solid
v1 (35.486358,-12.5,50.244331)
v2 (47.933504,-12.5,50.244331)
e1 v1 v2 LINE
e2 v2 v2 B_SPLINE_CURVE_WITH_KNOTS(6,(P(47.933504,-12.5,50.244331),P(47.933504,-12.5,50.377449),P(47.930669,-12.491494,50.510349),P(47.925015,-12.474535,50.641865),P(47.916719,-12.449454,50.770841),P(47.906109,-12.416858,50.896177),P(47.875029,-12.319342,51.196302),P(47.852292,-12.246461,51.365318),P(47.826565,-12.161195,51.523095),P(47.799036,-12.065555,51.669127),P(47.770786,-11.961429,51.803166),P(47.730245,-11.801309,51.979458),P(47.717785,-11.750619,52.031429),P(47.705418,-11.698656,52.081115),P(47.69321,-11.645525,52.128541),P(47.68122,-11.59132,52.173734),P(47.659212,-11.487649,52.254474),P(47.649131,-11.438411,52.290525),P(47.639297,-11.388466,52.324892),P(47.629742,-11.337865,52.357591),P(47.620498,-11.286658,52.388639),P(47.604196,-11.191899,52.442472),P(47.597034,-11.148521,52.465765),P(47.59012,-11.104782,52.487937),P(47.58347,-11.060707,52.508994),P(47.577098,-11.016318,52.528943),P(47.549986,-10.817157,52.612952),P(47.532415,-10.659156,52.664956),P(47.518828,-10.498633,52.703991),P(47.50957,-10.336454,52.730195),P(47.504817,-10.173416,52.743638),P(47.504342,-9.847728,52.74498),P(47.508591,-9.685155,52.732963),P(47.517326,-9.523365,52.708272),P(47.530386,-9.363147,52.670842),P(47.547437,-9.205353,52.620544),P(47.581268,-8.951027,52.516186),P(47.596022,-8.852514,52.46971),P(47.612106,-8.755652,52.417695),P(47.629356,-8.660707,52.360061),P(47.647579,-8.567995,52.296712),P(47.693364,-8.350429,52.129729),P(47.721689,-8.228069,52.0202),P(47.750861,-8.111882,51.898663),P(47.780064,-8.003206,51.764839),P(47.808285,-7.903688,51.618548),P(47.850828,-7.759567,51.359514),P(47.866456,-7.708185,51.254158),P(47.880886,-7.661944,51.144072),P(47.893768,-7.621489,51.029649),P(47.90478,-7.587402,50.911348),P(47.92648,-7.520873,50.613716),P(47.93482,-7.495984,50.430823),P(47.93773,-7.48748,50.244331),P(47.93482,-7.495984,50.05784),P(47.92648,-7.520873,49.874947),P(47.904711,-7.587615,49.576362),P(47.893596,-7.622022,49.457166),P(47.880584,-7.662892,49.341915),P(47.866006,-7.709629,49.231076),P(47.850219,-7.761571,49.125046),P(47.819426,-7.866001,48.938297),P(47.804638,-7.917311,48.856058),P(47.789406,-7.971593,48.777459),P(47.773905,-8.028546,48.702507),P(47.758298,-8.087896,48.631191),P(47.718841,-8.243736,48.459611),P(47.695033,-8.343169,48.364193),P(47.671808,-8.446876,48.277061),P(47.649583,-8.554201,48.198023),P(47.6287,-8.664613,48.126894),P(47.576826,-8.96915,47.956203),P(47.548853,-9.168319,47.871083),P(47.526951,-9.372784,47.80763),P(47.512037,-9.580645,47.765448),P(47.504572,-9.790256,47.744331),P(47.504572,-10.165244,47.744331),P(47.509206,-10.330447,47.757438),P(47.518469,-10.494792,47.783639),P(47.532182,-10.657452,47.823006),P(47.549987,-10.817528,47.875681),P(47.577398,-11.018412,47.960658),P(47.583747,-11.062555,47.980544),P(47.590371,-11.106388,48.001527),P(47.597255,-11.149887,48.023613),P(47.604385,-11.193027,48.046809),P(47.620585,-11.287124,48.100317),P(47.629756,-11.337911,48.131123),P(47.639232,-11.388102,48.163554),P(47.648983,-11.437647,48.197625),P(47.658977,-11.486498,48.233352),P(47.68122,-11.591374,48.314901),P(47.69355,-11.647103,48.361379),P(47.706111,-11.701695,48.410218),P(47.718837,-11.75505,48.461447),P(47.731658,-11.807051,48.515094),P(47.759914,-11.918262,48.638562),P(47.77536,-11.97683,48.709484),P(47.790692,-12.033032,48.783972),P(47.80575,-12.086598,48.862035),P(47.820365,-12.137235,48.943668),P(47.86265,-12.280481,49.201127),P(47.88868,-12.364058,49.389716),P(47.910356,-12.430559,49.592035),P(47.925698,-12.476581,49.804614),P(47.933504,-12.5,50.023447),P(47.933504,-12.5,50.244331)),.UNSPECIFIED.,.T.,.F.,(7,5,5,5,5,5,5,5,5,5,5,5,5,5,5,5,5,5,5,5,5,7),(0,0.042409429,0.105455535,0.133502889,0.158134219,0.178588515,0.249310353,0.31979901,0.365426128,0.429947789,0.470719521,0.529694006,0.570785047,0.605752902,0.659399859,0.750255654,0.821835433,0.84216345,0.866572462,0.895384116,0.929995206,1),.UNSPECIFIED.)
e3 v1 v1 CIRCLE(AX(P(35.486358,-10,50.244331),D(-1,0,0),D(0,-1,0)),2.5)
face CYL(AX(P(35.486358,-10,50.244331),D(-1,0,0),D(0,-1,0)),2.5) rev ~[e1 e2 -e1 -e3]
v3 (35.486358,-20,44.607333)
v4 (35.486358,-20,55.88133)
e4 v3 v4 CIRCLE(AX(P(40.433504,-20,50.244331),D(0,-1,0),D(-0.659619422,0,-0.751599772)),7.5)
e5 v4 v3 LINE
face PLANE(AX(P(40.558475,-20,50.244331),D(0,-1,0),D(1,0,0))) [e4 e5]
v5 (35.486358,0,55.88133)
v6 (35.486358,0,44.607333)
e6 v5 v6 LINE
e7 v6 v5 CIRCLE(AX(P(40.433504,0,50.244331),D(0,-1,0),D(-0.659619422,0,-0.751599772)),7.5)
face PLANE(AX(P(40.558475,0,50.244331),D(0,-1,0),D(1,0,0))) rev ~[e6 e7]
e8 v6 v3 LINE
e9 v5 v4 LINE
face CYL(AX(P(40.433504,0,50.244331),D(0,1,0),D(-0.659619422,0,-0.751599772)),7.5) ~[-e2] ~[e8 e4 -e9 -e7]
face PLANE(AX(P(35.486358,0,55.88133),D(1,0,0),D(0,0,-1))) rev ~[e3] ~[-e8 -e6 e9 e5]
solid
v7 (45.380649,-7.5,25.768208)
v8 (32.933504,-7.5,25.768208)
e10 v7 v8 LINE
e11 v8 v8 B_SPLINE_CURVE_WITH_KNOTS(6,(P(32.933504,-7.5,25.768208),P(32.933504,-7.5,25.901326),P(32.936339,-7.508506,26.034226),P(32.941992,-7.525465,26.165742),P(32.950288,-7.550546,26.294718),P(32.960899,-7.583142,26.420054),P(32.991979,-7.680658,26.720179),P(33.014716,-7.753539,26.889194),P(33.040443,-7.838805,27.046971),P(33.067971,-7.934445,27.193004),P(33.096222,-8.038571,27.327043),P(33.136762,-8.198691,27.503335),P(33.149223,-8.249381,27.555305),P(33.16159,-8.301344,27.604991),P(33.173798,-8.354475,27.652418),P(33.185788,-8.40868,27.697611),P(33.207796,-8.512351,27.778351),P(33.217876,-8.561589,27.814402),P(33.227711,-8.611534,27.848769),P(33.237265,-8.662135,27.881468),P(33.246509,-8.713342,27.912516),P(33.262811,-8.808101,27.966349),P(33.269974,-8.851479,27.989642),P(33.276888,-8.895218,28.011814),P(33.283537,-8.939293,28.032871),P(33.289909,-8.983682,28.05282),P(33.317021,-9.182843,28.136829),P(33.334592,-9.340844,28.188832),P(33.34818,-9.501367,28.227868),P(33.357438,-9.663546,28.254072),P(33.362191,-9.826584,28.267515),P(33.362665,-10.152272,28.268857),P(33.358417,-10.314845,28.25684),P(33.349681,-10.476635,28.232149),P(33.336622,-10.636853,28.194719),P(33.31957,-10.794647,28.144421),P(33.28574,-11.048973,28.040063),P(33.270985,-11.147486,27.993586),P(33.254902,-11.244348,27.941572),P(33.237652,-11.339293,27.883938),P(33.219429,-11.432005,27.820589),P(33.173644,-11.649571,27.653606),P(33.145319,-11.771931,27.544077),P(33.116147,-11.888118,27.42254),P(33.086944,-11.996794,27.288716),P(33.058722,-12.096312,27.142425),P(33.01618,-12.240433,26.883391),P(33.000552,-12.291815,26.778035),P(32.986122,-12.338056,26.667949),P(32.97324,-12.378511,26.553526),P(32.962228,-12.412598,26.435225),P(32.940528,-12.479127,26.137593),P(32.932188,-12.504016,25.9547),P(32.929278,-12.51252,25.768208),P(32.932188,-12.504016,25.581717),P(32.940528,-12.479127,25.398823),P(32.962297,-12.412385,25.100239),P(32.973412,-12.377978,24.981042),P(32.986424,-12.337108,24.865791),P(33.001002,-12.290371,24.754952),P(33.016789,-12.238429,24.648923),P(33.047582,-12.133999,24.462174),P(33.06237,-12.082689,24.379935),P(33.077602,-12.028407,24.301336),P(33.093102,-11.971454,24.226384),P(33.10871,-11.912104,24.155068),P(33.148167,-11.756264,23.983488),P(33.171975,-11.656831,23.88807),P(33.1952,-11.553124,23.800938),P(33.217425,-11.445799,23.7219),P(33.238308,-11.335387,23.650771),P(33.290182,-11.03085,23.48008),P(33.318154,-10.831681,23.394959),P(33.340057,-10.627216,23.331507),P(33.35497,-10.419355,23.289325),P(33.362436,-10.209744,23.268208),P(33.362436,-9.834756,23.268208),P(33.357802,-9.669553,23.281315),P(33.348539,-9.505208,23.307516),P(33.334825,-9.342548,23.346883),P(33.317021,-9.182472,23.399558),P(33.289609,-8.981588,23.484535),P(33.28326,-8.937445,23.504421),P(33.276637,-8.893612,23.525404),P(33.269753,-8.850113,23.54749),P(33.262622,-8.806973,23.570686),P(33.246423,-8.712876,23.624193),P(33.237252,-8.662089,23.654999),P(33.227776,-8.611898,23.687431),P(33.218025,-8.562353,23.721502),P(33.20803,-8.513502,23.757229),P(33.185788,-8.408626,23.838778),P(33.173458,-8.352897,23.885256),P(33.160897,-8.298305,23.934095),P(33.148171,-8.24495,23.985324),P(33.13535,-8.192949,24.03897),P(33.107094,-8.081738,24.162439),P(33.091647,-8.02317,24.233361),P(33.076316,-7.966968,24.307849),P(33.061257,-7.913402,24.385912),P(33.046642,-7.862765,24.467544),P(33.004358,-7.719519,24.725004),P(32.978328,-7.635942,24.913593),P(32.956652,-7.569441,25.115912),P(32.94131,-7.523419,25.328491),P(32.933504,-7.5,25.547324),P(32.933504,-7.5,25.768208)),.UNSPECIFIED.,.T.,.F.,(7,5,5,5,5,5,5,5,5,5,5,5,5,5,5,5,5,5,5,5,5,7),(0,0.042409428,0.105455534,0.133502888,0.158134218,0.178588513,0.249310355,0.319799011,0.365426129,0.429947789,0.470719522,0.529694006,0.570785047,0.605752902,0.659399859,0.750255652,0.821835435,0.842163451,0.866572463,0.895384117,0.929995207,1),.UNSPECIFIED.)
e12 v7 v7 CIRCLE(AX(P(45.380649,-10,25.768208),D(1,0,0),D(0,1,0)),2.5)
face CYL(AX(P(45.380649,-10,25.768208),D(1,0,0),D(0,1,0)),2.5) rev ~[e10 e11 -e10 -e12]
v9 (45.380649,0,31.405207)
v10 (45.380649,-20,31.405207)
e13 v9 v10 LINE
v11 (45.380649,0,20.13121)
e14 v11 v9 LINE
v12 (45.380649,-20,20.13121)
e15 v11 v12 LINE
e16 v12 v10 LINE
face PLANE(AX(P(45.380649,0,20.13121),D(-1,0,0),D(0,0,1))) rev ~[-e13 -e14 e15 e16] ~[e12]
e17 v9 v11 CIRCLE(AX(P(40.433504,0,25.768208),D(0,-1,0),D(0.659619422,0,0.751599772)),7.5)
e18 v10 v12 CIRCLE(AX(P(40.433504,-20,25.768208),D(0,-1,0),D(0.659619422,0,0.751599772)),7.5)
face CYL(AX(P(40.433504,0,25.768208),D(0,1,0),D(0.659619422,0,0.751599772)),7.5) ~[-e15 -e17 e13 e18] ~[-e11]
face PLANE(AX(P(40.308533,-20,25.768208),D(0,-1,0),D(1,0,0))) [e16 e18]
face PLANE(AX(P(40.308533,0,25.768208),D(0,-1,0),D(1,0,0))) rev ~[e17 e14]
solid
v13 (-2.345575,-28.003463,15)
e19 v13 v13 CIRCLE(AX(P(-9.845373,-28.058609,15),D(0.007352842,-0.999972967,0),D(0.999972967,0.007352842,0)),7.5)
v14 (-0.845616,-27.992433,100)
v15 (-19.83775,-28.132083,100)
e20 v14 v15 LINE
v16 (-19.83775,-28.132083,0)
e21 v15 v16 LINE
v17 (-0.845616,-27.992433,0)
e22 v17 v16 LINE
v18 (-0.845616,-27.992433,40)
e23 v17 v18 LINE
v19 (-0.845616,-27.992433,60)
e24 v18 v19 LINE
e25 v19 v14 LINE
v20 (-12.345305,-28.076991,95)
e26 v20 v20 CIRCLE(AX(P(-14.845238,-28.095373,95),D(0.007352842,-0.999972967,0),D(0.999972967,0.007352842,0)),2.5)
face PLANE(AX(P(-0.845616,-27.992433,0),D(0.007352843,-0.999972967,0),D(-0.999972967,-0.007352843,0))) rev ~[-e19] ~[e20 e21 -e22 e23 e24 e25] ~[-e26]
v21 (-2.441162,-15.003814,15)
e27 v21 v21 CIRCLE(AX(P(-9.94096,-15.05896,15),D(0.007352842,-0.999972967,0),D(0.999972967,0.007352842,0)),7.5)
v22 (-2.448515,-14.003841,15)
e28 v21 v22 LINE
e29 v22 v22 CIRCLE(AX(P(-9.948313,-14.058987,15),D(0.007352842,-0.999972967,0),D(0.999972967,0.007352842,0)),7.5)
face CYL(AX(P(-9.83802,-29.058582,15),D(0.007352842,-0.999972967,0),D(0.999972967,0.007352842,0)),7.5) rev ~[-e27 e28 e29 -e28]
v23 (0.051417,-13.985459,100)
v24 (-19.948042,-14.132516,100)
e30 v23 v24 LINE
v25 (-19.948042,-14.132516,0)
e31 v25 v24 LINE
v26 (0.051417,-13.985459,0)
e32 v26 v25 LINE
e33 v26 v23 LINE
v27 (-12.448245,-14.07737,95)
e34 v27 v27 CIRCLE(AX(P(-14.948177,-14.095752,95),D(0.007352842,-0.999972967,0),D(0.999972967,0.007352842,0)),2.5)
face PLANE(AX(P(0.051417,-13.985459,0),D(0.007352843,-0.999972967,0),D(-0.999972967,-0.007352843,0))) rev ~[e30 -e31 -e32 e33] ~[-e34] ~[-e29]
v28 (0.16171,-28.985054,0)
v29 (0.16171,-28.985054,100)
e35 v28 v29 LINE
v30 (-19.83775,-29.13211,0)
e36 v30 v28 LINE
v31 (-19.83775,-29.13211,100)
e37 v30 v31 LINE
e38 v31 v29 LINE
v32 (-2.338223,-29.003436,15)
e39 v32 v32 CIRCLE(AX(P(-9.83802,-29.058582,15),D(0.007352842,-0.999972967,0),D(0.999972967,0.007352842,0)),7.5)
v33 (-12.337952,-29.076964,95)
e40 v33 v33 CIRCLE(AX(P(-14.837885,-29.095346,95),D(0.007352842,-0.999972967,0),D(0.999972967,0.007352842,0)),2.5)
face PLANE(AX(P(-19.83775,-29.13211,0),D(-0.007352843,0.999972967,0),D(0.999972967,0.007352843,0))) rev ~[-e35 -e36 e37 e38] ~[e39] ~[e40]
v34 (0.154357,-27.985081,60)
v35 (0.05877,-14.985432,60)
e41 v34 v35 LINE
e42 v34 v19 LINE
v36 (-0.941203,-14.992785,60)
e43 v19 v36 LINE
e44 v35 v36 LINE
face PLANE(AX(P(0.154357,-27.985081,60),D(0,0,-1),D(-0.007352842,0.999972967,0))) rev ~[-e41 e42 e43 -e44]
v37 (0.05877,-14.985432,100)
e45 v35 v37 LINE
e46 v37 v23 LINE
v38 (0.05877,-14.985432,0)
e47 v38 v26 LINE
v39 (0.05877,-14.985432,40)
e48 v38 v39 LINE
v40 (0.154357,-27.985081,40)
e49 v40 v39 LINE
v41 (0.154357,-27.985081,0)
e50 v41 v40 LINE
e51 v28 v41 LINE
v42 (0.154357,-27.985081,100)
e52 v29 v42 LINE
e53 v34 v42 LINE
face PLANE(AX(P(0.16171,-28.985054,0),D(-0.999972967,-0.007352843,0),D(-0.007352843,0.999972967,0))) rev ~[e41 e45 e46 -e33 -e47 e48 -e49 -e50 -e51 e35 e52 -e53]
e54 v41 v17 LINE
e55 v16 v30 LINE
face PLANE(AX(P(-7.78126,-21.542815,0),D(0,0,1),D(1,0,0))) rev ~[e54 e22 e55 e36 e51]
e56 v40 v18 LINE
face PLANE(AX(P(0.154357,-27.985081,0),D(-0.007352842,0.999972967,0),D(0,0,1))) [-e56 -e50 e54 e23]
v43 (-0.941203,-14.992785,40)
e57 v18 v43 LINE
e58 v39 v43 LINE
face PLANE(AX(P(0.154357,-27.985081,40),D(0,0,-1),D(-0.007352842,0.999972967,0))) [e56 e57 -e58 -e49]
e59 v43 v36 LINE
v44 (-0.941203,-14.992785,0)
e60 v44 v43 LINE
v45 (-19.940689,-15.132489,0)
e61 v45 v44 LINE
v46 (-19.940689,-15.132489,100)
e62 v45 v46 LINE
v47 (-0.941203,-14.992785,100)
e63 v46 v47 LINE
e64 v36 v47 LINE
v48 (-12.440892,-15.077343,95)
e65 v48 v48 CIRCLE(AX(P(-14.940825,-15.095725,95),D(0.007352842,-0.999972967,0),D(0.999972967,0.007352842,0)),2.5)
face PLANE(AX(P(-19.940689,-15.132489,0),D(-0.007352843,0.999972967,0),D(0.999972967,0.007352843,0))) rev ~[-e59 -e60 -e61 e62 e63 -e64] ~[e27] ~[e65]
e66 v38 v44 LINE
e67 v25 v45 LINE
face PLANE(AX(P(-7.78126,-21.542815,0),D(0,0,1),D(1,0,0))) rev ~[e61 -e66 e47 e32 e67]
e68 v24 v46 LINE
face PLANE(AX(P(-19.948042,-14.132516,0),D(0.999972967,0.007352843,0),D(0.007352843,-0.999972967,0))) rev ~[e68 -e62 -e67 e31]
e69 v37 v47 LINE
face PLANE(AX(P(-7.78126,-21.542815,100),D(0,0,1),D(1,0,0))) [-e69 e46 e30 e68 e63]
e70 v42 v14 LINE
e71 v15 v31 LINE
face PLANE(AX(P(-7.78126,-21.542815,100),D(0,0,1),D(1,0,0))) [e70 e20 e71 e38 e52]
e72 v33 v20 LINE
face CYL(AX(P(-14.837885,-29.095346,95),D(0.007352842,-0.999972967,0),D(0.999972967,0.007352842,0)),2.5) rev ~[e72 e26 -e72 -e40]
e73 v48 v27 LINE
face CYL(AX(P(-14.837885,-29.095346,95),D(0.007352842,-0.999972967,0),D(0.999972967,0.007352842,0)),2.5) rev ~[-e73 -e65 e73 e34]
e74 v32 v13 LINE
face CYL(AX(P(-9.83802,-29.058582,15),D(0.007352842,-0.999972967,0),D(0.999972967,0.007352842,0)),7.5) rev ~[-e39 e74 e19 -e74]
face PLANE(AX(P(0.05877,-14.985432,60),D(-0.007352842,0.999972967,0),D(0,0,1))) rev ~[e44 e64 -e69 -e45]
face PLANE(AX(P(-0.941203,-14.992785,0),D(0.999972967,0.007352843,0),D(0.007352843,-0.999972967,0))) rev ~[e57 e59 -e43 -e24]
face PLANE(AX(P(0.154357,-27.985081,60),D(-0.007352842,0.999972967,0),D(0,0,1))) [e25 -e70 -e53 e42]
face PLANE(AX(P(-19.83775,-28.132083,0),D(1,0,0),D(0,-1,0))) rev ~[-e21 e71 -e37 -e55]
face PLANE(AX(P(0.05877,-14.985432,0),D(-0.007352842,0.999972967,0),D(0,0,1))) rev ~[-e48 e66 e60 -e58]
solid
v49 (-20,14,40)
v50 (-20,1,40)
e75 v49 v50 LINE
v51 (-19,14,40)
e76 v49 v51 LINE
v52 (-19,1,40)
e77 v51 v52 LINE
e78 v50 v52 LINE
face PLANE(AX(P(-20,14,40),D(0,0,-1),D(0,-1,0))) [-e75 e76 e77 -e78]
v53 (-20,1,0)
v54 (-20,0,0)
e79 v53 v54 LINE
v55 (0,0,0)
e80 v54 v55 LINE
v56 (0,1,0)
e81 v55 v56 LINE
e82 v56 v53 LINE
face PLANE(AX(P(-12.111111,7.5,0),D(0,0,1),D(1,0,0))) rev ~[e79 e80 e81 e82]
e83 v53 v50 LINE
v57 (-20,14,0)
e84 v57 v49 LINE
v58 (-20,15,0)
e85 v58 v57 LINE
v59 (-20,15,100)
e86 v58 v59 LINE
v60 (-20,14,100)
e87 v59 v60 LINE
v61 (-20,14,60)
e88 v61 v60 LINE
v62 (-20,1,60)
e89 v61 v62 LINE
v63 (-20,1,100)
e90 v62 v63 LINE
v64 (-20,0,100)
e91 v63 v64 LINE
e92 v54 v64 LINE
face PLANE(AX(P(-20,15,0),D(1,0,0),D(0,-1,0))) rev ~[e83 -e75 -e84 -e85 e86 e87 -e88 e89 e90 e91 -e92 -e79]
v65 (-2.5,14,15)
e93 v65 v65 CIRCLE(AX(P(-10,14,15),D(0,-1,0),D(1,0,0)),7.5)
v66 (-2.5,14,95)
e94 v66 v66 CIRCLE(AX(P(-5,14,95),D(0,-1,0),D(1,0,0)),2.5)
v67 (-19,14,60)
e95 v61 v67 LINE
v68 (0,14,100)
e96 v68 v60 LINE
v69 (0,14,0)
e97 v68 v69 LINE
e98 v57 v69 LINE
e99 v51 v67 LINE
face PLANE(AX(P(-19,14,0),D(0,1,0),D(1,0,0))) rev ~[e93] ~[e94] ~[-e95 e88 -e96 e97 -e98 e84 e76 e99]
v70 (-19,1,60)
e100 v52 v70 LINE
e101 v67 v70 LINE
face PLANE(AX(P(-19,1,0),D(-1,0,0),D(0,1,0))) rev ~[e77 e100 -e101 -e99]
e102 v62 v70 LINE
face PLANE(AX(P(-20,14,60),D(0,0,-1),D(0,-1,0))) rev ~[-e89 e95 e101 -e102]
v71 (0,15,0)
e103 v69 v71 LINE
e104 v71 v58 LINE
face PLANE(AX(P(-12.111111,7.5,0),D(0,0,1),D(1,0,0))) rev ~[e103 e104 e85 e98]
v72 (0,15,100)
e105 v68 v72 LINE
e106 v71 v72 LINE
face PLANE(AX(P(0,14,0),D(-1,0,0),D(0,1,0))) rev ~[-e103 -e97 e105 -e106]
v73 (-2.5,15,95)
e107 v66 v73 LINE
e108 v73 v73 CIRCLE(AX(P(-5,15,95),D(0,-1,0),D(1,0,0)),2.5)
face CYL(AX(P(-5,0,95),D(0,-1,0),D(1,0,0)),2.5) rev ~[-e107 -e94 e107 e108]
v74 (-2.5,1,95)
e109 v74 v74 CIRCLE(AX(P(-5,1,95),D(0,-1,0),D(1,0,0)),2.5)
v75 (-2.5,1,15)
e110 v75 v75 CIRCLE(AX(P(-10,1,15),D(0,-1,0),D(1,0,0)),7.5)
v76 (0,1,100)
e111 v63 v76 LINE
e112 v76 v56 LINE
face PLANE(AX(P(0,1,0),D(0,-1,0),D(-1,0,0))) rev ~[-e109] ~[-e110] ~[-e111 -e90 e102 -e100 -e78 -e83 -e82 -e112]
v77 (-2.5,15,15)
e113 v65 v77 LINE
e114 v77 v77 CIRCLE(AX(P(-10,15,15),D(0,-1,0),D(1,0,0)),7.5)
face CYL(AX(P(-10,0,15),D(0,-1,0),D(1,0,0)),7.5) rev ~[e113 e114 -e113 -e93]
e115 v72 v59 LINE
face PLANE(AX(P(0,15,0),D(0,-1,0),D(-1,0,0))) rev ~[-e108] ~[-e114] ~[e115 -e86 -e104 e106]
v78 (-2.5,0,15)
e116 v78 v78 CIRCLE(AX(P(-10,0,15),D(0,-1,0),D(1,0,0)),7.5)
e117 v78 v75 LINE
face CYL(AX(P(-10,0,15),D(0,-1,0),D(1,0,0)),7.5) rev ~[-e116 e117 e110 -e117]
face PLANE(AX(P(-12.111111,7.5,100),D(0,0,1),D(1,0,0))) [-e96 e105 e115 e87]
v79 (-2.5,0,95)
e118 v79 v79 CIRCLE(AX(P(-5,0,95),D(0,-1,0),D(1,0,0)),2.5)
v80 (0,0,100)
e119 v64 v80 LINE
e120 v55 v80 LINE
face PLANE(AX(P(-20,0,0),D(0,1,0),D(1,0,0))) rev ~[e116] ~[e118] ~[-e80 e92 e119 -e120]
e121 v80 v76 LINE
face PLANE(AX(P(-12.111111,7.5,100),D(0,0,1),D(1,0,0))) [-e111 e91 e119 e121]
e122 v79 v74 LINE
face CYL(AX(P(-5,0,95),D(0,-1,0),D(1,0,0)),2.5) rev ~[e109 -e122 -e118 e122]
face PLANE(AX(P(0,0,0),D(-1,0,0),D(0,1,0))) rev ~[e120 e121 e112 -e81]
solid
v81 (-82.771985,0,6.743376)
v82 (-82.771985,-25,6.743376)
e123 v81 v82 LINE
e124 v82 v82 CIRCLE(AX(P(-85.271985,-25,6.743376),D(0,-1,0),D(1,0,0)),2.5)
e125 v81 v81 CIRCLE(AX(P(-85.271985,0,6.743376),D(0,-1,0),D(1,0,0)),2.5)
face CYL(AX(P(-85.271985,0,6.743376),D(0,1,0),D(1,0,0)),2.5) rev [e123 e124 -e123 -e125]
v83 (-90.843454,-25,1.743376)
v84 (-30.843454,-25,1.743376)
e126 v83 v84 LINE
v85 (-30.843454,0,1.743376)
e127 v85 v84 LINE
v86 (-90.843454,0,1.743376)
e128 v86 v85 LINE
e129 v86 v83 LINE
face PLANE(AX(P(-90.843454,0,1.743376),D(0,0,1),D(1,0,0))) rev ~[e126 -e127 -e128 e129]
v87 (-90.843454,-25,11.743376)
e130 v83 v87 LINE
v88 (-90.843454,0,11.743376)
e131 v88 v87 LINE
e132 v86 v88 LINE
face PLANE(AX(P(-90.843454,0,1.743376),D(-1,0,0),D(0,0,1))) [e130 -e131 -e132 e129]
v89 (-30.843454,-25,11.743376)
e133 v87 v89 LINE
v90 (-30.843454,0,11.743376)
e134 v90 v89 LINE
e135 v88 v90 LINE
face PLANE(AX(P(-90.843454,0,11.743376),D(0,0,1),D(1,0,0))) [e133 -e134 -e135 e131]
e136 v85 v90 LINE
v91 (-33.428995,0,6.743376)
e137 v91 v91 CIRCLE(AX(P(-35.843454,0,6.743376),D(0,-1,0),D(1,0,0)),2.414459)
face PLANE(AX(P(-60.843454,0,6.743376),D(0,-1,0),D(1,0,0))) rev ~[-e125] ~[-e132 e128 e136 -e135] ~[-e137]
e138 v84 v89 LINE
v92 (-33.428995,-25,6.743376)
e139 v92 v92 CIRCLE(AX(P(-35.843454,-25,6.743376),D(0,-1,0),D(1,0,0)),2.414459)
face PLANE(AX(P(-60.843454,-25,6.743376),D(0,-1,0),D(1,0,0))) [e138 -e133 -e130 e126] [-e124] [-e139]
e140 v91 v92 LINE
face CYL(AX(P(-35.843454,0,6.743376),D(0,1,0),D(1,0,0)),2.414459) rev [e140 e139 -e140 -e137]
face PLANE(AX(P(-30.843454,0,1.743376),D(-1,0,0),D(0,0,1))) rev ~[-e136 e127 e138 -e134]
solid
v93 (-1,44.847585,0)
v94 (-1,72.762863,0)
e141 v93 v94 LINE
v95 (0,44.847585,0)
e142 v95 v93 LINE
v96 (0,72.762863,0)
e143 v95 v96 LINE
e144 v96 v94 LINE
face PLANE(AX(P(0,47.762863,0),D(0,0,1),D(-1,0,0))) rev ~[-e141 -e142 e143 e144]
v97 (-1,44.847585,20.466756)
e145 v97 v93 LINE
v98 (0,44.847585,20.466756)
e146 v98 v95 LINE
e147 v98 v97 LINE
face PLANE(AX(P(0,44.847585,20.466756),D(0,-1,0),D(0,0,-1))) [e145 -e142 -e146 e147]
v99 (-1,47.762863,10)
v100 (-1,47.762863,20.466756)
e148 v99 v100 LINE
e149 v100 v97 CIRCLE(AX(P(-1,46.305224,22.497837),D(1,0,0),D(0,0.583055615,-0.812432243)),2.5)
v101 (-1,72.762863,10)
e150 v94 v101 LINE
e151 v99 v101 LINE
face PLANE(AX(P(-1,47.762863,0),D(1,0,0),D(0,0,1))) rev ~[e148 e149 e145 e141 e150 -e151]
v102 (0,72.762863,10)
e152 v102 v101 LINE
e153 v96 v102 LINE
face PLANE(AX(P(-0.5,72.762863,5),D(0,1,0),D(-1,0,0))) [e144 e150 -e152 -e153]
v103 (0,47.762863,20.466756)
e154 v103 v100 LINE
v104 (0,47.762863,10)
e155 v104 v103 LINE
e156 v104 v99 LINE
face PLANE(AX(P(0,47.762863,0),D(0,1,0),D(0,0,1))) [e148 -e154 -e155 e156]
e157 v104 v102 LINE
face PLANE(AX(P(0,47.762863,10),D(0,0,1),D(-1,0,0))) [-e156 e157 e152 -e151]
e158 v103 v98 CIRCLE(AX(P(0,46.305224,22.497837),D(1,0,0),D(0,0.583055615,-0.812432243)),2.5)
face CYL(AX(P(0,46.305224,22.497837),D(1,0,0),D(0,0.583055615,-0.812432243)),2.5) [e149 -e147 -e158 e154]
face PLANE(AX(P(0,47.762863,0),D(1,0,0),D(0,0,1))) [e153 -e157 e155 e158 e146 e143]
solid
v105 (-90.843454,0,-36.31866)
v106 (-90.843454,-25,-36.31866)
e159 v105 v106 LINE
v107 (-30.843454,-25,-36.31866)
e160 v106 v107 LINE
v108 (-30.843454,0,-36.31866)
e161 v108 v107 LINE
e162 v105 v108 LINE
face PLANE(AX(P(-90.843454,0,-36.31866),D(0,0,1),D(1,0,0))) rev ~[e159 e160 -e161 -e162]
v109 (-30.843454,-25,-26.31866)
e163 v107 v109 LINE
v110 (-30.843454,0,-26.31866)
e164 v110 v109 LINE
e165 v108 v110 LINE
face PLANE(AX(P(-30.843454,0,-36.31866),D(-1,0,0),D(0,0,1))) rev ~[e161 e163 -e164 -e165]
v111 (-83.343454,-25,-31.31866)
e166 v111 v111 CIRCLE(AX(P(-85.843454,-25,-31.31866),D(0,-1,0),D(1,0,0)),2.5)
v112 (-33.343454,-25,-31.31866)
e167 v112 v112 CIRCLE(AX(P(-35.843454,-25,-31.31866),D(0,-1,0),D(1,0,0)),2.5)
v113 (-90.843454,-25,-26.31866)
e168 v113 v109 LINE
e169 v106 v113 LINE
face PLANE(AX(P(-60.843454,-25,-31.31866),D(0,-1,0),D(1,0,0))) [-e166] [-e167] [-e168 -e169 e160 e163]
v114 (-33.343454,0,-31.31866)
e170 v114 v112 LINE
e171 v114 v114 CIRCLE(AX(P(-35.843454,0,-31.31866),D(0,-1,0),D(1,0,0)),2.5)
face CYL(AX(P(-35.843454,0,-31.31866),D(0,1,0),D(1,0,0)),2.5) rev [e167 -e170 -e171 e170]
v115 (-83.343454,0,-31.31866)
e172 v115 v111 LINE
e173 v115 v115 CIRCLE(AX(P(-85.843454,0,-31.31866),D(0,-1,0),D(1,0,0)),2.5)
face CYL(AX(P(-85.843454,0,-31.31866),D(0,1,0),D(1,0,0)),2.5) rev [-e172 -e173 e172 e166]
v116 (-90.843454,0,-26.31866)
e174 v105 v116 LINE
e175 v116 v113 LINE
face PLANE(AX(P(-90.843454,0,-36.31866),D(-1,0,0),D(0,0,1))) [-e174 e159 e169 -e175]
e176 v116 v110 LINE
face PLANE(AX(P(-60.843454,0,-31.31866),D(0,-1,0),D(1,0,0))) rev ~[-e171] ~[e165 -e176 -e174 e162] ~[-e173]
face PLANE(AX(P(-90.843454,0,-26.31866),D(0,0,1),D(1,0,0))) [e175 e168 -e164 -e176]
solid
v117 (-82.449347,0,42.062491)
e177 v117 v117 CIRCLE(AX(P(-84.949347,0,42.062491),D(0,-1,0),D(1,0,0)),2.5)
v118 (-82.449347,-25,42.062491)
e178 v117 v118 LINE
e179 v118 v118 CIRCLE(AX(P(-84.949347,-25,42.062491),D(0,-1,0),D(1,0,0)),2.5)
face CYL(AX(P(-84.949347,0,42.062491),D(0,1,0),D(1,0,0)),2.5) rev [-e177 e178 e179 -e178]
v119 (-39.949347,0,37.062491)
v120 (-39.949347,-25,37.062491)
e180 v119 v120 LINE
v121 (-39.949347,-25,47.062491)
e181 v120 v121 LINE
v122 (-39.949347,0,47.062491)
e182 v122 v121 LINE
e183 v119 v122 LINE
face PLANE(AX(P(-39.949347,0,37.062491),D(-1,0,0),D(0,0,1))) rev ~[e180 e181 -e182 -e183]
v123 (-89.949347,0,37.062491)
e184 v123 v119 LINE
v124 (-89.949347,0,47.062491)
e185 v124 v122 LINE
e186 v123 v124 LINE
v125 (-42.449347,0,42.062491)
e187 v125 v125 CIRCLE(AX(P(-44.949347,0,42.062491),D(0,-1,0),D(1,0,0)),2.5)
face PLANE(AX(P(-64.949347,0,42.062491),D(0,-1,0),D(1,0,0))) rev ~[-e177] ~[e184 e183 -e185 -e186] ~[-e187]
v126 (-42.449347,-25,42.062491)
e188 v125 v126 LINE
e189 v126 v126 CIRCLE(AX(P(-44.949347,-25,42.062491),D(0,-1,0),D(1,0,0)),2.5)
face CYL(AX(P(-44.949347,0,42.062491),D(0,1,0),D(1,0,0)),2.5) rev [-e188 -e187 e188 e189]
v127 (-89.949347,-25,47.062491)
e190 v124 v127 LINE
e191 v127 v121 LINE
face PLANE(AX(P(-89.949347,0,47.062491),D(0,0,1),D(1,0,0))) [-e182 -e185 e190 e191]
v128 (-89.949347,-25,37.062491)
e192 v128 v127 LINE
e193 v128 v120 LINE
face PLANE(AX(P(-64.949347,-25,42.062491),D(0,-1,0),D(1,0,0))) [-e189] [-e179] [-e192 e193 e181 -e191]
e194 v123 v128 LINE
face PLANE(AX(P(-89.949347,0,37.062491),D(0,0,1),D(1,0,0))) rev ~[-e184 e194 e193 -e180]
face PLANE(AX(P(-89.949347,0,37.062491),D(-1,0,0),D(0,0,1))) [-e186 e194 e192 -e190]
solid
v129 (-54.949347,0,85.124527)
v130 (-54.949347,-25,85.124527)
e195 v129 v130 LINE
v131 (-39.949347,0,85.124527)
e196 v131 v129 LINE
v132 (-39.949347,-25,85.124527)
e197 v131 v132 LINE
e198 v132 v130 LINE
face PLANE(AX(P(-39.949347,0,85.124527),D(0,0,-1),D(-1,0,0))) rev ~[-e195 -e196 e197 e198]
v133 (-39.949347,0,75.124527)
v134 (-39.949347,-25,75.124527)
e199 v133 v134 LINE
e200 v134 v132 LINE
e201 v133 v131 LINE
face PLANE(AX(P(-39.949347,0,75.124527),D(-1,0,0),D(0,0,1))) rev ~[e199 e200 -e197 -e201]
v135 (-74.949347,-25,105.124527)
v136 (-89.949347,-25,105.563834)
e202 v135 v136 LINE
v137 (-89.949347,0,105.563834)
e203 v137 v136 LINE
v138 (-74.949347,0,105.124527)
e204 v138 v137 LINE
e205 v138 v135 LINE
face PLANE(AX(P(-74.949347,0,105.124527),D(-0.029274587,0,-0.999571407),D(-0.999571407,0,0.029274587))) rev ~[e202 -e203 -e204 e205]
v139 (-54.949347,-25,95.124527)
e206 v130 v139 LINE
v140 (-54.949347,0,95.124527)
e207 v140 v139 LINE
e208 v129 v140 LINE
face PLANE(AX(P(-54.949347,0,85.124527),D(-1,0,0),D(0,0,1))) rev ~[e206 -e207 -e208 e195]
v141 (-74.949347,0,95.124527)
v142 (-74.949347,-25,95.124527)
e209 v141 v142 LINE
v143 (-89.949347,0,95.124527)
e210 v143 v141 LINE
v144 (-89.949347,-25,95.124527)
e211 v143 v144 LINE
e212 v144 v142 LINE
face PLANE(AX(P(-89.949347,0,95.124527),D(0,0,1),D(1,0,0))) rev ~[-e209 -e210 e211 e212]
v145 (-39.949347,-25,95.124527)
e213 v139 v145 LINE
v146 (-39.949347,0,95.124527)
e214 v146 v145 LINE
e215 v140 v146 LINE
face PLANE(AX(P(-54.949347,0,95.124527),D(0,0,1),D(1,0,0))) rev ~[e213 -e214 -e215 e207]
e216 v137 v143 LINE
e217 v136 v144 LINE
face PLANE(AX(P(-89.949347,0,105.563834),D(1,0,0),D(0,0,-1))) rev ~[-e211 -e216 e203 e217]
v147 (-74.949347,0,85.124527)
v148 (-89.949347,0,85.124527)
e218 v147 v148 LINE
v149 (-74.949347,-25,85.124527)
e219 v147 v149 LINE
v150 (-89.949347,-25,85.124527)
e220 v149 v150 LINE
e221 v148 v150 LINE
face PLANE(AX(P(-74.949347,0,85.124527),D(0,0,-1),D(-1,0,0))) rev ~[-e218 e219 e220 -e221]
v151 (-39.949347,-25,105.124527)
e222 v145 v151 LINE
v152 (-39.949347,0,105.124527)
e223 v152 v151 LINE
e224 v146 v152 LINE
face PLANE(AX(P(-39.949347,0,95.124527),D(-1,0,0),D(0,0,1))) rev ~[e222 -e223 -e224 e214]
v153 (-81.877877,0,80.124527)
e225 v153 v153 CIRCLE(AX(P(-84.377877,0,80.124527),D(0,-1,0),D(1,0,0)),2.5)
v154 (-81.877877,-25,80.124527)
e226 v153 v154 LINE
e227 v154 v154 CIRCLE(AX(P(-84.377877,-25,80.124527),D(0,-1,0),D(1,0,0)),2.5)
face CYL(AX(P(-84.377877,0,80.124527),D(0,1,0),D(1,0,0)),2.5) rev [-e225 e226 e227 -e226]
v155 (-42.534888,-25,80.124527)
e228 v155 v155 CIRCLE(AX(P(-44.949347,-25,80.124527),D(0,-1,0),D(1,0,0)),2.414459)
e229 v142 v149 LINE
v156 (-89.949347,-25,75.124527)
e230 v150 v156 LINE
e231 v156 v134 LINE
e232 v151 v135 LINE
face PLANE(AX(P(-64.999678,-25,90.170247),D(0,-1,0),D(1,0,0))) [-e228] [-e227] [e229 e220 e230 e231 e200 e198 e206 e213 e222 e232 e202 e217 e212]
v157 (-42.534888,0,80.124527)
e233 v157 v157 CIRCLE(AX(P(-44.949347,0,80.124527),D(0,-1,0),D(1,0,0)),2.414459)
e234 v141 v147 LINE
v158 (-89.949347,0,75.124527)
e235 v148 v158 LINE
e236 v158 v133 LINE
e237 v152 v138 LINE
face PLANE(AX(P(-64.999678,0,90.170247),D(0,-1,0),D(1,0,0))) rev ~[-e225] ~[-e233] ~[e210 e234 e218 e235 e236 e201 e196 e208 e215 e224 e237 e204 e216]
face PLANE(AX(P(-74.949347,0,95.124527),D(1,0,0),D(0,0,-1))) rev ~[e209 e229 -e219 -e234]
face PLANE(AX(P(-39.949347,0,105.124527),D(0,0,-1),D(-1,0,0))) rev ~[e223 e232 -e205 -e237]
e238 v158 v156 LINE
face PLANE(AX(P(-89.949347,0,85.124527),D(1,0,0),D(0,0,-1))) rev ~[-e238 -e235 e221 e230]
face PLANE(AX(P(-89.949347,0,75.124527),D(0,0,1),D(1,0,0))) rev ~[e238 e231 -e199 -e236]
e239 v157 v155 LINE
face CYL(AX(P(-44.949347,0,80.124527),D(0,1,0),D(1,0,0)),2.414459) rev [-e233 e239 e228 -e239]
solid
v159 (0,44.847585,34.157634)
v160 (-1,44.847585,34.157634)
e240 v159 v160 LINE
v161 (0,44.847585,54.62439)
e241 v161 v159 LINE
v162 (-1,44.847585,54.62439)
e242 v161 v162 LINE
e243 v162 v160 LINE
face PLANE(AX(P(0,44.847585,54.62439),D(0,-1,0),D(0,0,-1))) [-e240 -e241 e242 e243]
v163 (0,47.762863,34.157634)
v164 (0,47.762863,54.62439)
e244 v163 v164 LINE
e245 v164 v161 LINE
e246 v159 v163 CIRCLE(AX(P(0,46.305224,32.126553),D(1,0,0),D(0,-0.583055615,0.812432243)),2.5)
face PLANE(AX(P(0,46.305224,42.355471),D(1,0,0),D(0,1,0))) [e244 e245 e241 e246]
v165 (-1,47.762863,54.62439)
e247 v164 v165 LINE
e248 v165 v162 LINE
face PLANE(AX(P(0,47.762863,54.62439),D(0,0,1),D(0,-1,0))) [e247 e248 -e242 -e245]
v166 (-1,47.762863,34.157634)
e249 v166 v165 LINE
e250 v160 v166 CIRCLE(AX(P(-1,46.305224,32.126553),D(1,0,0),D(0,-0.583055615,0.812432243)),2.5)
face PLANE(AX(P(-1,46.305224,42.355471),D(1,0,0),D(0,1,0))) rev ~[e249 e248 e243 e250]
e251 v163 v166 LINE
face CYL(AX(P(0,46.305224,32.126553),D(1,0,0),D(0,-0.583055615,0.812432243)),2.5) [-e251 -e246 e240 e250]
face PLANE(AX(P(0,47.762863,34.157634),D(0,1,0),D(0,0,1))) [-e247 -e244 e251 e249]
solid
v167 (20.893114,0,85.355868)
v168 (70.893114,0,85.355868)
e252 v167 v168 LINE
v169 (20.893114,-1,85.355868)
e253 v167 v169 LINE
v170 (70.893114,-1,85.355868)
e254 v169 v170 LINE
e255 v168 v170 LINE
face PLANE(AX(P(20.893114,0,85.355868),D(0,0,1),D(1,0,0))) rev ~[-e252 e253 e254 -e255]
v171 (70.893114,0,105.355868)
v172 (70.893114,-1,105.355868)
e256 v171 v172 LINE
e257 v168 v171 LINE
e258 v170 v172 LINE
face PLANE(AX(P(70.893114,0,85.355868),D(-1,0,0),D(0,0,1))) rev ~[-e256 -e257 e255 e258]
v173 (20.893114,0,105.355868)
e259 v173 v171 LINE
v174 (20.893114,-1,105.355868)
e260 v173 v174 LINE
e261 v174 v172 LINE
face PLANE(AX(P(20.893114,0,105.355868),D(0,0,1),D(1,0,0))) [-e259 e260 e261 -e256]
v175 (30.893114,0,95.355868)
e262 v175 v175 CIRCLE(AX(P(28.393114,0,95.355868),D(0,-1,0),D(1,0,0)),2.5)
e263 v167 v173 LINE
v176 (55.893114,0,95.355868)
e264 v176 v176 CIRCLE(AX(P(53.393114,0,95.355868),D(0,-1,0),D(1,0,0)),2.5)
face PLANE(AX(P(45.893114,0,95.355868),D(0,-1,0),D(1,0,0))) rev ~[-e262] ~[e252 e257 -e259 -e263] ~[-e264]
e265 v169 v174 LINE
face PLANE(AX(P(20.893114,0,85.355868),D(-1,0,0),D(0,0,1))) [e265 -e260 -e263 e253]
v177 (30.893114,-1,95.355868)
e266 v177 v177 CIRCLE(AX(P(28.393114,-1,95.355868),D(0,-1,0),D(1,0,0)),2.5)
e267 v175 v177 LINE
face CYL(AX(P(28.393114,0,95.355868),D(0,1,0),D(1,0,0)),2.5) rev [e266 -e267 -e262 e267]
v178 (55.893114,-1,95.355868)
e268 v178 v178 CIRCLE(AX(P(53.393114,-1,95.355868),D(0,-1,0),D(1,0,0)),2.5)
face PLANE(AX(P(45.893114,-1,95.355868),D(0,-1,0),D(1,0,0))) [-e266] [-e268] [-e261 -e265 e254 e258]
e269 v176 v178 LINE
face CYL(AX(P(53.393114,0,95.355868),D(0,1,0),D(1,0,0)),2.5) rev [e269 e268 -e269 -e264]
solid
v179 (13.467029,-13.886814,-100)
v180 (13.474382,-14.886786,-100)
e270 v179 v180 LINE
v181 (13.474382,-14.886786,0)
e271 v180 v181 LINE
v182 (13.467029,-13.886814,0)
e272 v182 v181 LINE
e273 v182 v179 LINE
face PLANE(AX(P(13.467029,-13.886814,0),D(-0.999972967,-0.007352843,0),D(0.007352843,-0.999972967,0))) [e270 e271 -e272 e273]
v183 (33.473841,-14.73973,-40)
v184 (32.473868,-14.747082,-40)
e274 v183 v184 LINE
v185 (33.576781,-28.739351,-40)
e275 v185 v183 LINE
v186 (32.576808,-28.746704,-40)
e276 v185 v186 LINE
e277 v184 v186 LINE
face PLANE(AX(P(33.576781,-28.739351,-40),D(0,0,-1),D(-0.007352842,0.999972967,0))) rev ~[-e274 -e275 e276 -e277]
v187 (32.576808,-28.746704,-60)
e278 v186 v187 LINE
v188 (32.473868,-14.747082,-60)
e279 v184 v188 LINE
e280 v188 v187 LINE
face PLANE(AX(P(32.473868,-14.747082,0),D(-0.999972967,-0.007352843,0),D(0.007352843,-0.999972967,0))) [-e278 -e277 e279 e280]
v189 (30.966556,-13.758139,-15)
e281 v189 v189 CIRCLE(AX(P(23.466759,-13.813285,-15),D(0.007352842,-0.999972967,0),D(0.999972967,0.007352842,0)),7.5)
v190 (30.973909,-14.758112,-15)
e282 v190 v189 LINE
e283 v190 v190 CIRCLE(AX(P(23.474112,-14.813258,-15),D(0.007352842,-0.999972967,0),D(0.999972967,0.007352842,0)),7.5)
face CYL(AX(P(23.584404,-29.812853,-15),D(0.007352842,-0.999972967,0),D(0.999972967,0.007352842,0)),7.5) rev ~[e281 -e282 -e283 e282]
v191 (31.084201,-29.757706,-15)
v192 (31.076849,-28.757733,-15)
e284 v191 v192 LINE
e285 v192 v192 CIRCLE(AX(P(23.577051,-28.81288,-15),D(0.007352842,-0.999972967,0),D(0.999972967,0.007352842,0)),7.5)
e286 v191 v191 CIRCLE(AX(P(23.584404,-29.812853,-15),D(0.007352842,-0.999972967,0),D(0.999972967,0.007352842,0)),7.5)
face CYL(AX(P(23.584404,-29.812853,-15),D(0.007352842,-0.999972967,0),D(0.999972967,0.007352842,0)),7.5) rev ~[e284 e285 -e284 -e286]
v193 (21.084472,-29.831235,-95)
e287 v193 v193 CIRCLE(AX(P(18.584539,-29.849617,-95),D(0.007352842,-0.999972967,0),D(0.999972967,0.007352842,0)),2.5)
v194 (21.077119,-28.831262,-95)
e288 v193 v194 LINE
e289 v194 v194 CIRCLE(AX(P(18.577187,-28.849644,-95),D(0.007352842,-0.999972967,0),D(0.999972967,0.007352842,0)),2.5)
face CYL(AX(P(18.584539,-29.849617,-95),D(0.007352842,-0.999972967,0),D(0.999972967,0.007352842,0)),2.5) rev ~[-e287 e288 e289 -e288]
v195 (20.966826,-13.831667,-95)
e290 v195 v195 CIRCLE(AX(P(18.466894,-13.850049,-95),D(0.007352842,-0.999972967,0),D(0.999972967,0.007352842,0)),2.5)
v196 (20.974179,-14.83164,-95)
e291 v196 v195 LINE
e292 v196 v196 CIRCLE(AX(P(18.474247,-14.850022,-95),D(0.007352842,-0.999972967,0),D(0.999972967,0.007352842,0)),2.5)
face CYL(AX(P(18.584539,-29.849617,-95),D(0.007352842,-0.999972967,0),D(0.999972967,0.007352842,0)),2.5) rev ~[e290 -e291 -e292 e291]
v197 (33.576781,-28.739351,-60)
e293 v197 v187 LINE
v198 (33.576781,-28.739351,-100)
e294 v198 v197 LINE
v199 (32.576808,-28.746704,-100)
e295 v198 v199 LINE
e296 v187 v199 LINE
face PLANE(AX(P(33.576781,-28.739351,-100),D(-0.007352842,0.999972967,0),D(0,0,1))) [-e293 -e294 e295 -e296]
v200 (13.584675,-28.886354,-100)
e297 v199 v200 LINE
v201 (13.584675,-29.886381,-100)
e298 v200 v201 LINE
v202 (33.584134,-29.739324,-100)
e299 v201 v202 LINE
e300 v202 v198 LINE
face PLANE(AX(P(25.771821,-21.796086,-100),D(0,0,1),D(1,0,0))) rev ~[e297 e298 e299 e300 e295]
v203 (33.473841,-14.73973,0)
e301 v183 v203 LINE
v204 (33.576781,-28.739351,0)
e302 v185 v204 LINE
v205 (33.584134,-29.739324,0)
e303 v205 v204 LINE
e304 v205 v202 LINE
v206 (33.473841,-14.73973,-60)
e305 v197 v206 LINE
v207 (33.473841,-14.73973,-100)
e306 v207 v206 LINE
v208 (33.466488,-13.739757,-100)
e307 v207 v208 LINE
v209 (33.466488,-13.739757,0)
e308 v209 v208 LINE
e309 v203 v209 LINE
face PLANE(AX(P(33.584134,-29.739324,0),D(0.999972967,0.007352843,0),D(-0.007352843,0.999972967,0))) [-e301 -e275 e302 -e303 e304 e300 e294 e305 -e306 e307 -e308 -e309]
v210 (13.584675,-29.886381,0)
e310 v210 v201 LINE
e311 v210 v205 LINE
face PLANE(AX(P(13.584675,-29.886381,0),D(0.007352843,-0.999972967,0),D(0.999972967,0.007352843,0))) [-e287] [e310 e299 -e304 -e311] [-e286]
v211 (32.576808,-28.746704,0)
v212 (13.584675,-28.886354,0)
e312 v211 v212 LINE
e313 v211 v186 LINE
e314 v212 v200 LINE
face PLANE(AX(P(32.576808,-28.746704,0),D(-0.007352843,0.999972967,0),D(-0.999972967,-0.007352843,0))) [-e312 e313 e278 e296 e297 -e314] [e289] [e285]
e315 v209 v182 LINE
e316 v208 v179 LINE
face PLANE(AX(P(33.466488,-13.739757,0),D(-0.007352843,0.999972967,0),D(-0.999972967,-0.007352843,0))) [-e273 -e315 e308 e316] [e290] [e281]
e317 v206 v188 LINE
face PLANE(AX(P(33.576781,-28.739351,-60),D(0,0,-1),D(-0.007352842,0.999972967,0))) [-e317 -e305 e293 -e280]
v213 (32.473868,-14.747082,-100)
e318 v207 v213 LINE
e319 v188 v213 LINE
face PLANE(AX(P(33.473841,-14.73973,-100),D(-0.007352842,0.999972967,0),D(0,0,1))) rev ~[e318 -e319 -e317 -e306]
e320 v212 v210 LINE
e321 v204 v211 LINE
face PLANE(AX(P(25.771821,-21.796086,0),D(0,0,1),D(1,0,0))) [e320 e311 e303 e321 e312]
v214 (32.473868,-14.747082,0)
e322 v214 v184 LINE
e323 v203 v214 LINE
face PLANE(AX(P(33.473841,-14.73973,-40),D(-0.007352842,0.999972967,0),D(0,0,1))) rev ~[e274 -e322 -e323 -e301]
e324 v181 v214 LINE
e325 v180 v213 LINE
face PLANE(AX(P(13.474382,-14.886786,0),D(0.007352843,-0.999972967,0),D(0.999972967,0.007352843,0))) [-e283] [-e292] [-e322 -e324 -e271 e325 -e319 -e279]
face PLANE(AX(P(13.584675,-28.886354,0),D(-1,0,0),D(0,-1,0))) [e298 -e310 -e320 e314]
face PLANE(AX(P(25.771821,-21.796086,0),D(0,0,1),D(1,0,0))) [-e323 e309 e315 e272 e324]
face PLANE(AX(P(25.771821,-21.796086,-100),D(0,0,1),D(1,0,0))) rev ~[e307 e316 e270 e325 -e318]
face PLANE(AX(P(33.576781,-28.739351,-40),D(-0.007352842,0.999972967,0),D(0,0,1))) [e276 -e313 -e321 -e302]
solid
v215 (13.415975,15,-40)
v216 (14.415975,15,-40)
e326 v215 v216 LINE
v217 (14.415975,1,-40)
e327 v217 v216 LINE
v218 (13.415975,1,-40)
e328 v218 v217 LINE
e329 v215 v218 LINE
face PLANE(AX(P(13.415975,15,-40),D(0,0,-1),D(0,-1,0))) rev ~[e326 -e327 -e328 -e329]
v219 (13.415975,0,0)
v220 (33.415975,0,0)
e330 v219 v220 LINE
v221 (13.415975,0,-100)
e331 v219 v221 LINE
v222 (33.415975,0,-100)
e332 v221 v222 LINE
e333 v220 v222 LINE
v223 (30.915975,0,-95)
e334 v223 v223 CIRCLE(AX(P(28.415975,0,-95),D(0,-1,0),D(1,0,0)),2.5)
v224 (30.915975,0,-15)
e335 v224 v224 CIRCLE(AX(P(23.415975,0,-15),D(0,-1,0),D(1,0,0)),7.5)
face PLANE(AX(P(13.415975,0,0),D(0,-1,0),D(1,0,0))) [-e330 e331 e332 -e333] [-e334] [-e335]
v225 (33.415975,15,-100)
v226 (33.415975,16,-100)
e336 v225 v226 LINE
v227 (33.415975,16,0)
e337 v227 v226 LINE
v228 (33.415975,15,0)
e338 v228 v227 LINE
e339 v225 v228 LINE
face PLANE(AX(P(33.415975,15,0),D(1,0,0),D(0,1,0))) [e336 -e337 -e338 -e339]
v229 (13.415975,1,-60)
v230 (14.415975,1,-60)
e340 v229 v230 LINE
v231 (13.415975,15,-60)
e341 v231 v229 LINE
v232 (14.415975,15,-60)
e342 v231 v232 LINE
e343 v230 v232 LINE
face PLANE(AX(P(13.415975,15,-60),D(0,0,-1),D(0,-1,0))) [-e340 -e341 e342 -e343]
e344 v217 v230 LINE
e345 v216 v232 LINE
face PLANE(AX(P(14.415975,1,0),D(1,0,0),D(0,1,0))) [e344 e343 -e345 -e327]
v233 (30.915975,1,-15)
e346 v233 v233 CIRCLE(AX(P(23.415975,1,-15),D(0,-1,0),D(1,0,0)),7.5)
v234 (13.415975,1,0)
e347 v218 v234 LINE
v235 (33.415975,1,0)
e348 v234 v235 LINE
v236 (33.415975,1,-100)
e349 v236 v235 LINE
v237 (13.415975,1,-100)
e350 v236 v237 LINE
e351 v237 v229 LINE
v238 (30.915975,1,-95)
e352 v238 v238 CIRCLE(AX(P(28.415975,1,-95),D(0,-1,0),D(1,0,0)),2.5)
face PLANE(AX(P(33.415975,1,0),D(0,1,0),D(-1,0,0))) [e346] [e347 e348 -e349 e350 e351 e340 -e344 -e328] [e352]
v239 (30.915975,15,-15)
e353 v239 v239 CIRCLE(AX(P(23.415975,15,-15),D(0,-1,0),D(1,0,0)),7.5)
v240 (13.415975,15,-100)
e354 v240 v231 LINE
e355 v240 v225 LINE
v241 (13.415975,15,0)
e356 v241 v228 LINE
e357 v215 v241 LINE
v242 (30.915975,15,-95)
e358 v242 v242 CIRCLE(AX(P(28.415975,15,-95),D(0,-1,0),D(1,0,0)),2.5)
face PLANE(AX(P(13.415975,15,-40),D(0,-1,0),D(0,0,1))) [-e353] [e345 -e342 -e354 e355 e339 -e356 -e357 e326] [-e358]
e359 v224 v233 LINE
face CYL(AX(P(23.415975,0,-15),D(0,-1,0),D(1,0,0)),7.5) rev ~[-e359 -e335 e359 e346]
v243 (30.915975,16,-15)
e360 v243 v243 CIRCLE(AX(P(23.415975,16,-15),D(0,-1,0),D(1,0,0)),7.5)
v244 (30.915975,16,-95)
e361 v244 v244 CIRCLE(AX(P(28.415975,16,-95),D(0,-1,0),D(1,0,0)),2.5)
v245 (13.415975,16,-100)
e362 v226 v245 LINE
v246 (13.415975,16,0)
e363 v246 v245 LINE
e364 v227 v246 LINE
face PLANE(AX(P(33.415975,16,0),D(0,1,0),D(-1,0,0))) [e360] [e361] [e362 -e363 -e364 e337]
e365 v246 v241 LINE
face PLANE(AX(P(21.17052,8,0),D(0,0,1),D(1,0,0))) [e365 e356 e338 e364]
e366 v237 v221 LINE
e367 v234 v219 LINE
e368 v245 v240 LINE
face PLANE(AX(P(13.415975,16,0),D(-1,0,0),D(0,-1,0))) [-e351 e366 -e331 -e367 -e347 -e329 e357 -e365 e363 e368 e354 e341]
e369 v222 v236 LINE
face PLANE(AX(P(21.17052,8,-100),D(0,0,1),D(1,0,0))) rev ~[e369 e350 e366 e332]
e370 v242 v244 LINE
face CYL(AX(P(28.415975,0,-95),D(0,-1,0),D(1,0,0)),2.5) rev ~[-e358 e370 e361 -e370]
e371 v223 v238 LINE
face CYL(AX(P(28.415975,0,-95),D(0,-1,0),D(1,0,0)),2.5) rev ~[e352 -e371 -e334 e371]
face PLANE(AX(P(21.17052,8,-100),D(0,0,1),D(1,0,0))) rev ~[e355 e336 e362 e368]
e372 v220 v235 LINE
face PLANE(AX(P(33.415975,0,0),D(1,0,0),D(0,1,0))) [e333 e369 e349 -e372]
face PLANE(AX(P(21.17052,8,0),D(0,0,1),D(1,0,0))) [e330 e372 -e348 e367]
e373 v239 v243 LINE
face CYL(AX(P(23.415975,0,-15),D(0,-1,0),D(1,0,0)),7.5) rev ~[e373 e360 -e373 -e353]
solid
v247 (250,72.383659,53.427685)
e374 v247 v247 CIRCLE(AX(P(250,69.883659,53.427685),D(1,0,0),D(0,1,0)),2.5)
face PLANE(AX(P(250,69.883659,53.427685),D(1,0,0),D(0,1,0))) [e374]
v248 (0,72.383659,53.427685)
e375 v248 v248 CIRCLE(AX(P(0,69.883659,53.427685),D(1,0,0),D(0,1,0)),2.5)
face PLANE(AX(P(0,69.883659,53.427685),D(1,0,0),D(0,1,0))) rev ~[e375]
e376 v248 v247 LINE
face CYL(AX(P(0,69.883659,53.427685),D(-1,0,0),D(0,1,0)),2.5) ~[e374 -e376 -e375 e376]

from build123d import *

# Parameters (mm, degrees)
F1_DEPTH  = 100
F2_R      = 7.5
F2_R_2    = 2.5
F3_DEPTH  = 15.001
F4_W      = 13
F4_H      = 40
F5_DEPTH  = 20.1627097718
F6_DEPTH  = 100
F7_R      = 7.5
F7_R_2    = 2.5
F8_DEPTH  = 16.001
F9_W      = 14
F9_H      = 40
F10_DEPTH = 20.1691592966
F11_W     = 50
F11_H     = 20
F11_R     = 2.5
F12_DEPTH = 1
F13_R     = 2.5
F13_R_2   = 7.5
F14_DEPTH = 45.1330833913
F15_R     = 7.5
F15_R_2   = 2.5
F16_DEPTH = 46.1330833913
F17_W     = 14
F17_H     = 40
F18_DEPTH = 53.5847666336
F19_W     = 13
F19_H     = 40
F20_DEPTH = 25
F22_DEPTH = 20
F23_R     = 2.5
F24_DEPTH = 250
F25_W     = 50
F25_H     = 10
F25_R     = 2.5
F26_DEPTH = 25
F25_R_2   = 2.4144593705
F25_W_2   = 60
F27_DEPTH = 25
F28_R     = 2.5
F29_DEPTH = 136.2251037518
F30_R     = 2.5
F31_DEPTH = 214.5146418358
F33_DEPTH = 1
F34_W     = 1
F34_H     = 10
F35_DEPTH = 25


# Not quite as in the source:
# - a feature names something its author has since deleted; it is built from what else it names


with BuildPart() as f1:
    # F0 (on Top) → F1 (new body)
    with BuildSketch(Plane.XY):
        Polygon((0, 14), (0, 15), (-20, 15), (-20, 0), (0, 0), (0, 1), (-19, 1), (-19, 14), align=None)
    extrude(amount=F1_DEPTH)

    # F2 (on face) → F3 (cut, through all)
    with BuildSketch(Plane.XZ):
        with Locations((-10, 15)):
            Circle(F2_R)
        with Locations((-5, 95)):
            Circle(F2_R_2)
    extrude(amount=-F3_DEPTH, mode=Mode.SUBTRACT)

    # F4 (on face) → F5 (cut, through all)
    with BuildSketch(Plane(origin=(-20, 0, 0), x_dir=(0, -1, 0), z_dir=(-1, 0, 0))):
        with Locations((-7.5, 20)):
            Rectangle(F4_W, F4_H)
        with Locations((-7.5, 80)):
            Rectangle(F4_W, F4_H)
    extrude(amount=-F5_DEPTH, mode=Mode.SUBTRACT)


with BuildPart() as f1b:
    # F0 (on Top) → F1, piece 2 (new body)
    with BuildSketch(Plane.XY):
        Polygon((0.051417134, -13.985459061), (-19.9480422158, -14.1325159114), (-19.9406893732, -15.1324888789), (-0.941202991, -14.992784871), (-0.8456160382, -27.9924334484), (-19.837749578, -28.1320833905), (-19.837749578, -29.1321104238), (0.1617097718, -28.9850535734), align=None)
    extrude(amount=F1_DEPTH)

    # F13 (on face) → F14 (cut, through all)
    with BuildSketch(Plane(origin=(0.2131255159, -28.9846755113, 0), x_dir=(0.9999729675, 0.0073528425, 0), z_dir=(0.0073528425, -0.9999729675, 0))):
        with Locations((-15.051417134, 95)):
            Circle(F13_R)
        with Locations((-10.051417134, 15)):
            Circle(F13_R_2)
    extrude(amount=-F14_DEPTH, mode=Mode.SUBTRACT)

    # F19 (on face) → F20 (cut)
    with BuildSketch(Plane(origin=(-0.0514157441, -0.0003780621, 0), x_dir=(-0.0073528425, 0.9999729675, 0), z_dir=(0.9999729675, 0.0073528425, 0))):
        with Locations((-21.485459061, 20)):
            Rectangle(F19_W, F19_H)
        with Locations((-21.485459061, 80)):
            Rectangle(F19_W, F19_H)
    extrude(amount=-F20_DEPTH, mode=Mode.SUBTRACT)


with BuildPart() as f6:
    # F0 (on Top) → F6 (new body)
    with BuildSketch(Plane.XY):
        Polygon((33.4159745649, 0), (33.4159745649, 1), (14.4159745649, 1), (14.4159745649, 15), (33.4159745649, 15), (33.4159745649, 16), (13.4159745649, 16), (13.4159745649, 0), align=None)
    extrude(amount=-F6_DEPTH)

    # F7 (on face) → F8 (cut, through all)
    with BuildSketch(Plane.XZ):
        with Locations((23.4159745649, -15)):
            Circle(F7_R)
        with Locations((28.4159745649, -95)):
            Circle(F7_R_2)
    extrude(amount=-F8_DEPTH, mode=Mode.SUBTRACT)

    # F9 (on face) → F10 (cut, through all)
    with BuildSketch(Plane(origin=(13.4159745649, 0, 0), x_dir=(0, -1, 0), z_dir=(-1, 0, 0))):
        with Locations((-8, -20)):
            Rectangle(F9_W, F9_H)
        with Locations((-8, -80)):
            Rectangle(F9_W, F9_H)
    extrude(amount=-F10_DEPTH, mode=Mode.SUBTRACT)


with BuildPart() as f6b:
    # F0 (on Top) → F6, piece 2 (new body)
    with BuildSketch(Plane.XY):
        Polygon((33.4664883811, -13.7397566624), (13.4670290313, -13.8868135128), (13.4743818739, -14.8867864803), (32.4738682561, -14.7470824724), (32.5768080514, -28.7467040172), (13.5846745117, -28.8863539594), (13.5846745117, -29.8863809926), (33.5841338614, -29.7393241422), align=None)
    extrude(amount=-F6_DEPTH)

    # F15 (on face) → F16 (cut, through all)
    with BuildSketch(Plane(origin=(0.2204783584, -29.9846484788, 0), x_dir=(0.9999729675, 0.0073528425, 0), z_dir=(0.0073528425, -0.9999729675, 0))):
        with Locations((23.3645574309, -15)):
            Circle(F15_R)
        with Locations((18.3645574309, -95)):
            Circle(F15_R_2)
    extrude(amount=-F16_DEPTH, mode=Mode.SUBTRACT)

    # F17 (on face) → F18 (cut, through all)
    with BuildSketch(Plane(origin=(33.3636555031, 0.2453243365, 0), x_dir=(-0.0073528425, 0.9999729675, 0), z_dir=(0.9999729675, 0.0073528425, 0))):
        with Locations((-21.985459061, -20)):
            Rectangle(F17_W, F17_H)
        with Locations((-21.985459061, -80)):
            Rectangle(F17_W, F17_H)
    extrude(amount=-F18_DEPTH, mode=Mode.SUBTRACT)


with BuildPart() as f12:
    # F11 (on Front) → F12 (new body)
    with BuildSketch(Plane.XZ):
        with Locations((45.8931141218, 95.3558683395)):
            Rectangle(F11_W, F11_H)
        with Locations((28.3931141218, 95.3558683395)):
            Circle(F11_R, mode=Mode.SUBTRACT)
        with Locations((53.3931141218, 95.3558683395)):
            Circle(F11_R, mode=Mode.SUBTRACT)
    extrude(amount=F12_DEPTH)


with BuildPart() as f22:
    # F21 (on Front) → F22 (new body)
    with BuildSketch(Plane.XZ):
        with BuildLine():
            Line((35.4863581642, 55.8813297105), (35.4863581642, 44.6073331245))
            ThreePointArc((35.4863581642, 44.6073331245), (47.9335038306, 50.2443314175), (35.4863581642, 55.8813297105))
        make_face()
    extrude(amount=F22_DEPTH)

    # F30 (on face) → F31 (cut, through all)
    with BuildSketch(Plane(origin=(35.4863581642, 0, 0), x_dir=(0, -1, 0), z_dir=(-1, 0, 0))):
        with Locations((10, 50.2443314175)):
            Circle(F30_R)
    extrude(amount=-F31_DEPTH, mode=Mode.SUBTRACT)


with BuildPart() as f22b:
    # F21 (on Front) → F22, piece 2 (new body)
    with BuildSketch(Plane.XZ):
        with BuildLine():
            Line((45.380649497, 20.1312099156), (45.380649497, 31.4052065016))
            ThreePointArc((45.380649497, 31.4052065016), (32.9335038306, 25.7682082086), (45.380649497, 20.1312099156))
        make_face()
    extrude(amount=F22_DEPTH)

    # F28 (on face) → F29 (cut, through all)
    with BuildSketch(Plane.YZ.offset(45.380649497)):
        with Locations((-10, 25.7682082086)):
            Circle(F28_R)
    extrude(amount=-F29_DEPTH, mode=Mode.SUBTRACT)


with BuildPart() as f24:
    # F23 (on Right) → F24 (new body)
    with BuildSketch(Plane.YZ):
        with Locations((69.883659482, 53.4276850522)):
            Circle(F23_R)
    extrude(amount=F24_DEPTH)


with BuildPart() as f26:
    # F25 (on Front) → F26 (new body)
    with BuildSketch(Plane.XZ):
        with Locations((-64.9493469292, 42.0624911785)):
            Rectangle(F25_W, F25_H)
        with Locations((-84.9493469292, 42.0624911785)):
            Circle(F25_R, mode=Mode.SUBTRACT)
        with Locations((-44.9493469292, 42.0624911785)):
            Circle(F25_R, mode=Mode.SUBTRACT)
    extrude(amount=F26_DEPTH)


with BuildPart() as f26b:
    # F25 (on Front) → F26, piece 2 (new body)
    with BuildSketch(Plane.XZ):
        Polygon((-89.9493469292, 85.124527216), (-89.9493469292, 75.124527216), (-39.9493469292, 75.124527216), (-39.9493469292, 85.124527216), (-54.9493469292, 85.124527216), (-54.9493469292, 95.124527216), (-39.9493469292, 95.124527216), (-39.9493469292, 105.124527216), (-54.9493469292, 105.124527216), (-64.9493469292, 105.124527216), (-74.9493469292, 105.124527216), (-89.9493469292, 105.5638343096), (-89.9493469292, 95.124527216), (-74.9493469292, 95.124527216), (-74.9493469292, 85.124527216), align=None)
        with Locations((-84.3778774142, 80.124527216)):
            Circle(F25_R, mode=Mode.SUBTRACT)
        with Locations((-44.9493469292, 80.124527216)):
            Circle(F25_R_2, mode=Mode.SUBTRACT)
    extrude(amount=F26_DEPTH)


with BuildPart() as f27:
    # F25 (on Front) → F27 (new body)
    with BuildSketch(Plane.XZ):
        with Locations((-60.8434542548, -31.3186603598)):
            Rectangle(F25_W_2, F25_H)
        with Locations((-85.8434542548, -31.3186603598)):
            Circle(F25_R, mode=Mode.SUBTRACT)
        with Locations((-35.8434542548, -31.3186603598)):
            Circle(F25_R, mode=Mode.SUBTRACT)
    extrude(amount=F27_DEPTH)


with BuildPart() as f27b:
    # F25 (on Front) → F27, piece 2 (new body)
    with BuildSketch(Plane.XZ):
        with Locations((-60.8434542548, 6.7433756776)):
            Rectangle(F25_W_2, F25_H)
        with Locations((-85.2719847398, 6.7433756776)):
            Circle(F25_R, mode=Mode.SUBTRACT)
        with Locations((-35.8434542548, 6.7433756776)):
            Circle(F25_R_2, mode=Mode.SUBTRACT)
    extrude(amount=F27_DEPTH)


with BuildPart() as f33:
    # F32 (on Right) → F33 (new body)
    with BuildSketch(Plane.YZ):
        with BuildLine():
            Line((47.762863338, 8.6800148711), (47.762863338, 20.4667558931))
            ThreePointArc((47.762863338, 20.4667558931), (46.3052242994, 24.9978365004), (44.8475852609, 20.4667558931))
            Line((44.8475852609, 20.4667558931), (44.8475852609, 8.6800148711))
            Line((44.8475852609, 8.6800148711), (44.8475852609, 0))
            Line((44.8475852609, 0), (47.762863338, 0))
            Line((47.762863338, 0), (47.762863338, 8.6800148711))
        make_face()
    extrude(amount=-F33_DEPTH)

    # F34 (on face) → F35 (join)
    with BuildSketch(Plane(origin=(0, 47.762863338, 0), x_dir=(-1, 0, 0), z_dir=(0, 1, 0))):
        with Locations((0.5, 5)):
            Rectangle(F34_W, F34_H)
    extrude(amount=F35_DEPTH)


with BuildPart() as f33b:
    # F32 (on Right) → F33, piece 2 (new body)
    with BuildSketch(Plane.YZ):
        with BuildLine():
            ThreePointArc((44.8475852609, 34.1576339639), (46.3052242994, 29.6265533566), (47.762863338, 34.1576339639))
            Line((47.762863338, 34.1576339639), (47.762863338, 45.944374986))
            Line((47.762863338, 45.944374986), (47.762863338, 54.6243898571))
            Line((47.762863338, 54.6243898571), (44.8475852609, 54.6243898571))
            Line((44.8475852609, 54.6243898571), (44.8475852609, 45.944374986))
            Line((44.8475852609, 45.944374986), (44.8475852609, 34.1576339639))
        make_face()
    extrude(amount=-F33_DEPTH)


solid = Compound([f1.part, f1b.part, f6.part, f6b.part, f12.part, f22.part, f22b.part, f24.part, f26.part, f26b.part, f27.part, f27b.part, f33.part, f33b.part])
